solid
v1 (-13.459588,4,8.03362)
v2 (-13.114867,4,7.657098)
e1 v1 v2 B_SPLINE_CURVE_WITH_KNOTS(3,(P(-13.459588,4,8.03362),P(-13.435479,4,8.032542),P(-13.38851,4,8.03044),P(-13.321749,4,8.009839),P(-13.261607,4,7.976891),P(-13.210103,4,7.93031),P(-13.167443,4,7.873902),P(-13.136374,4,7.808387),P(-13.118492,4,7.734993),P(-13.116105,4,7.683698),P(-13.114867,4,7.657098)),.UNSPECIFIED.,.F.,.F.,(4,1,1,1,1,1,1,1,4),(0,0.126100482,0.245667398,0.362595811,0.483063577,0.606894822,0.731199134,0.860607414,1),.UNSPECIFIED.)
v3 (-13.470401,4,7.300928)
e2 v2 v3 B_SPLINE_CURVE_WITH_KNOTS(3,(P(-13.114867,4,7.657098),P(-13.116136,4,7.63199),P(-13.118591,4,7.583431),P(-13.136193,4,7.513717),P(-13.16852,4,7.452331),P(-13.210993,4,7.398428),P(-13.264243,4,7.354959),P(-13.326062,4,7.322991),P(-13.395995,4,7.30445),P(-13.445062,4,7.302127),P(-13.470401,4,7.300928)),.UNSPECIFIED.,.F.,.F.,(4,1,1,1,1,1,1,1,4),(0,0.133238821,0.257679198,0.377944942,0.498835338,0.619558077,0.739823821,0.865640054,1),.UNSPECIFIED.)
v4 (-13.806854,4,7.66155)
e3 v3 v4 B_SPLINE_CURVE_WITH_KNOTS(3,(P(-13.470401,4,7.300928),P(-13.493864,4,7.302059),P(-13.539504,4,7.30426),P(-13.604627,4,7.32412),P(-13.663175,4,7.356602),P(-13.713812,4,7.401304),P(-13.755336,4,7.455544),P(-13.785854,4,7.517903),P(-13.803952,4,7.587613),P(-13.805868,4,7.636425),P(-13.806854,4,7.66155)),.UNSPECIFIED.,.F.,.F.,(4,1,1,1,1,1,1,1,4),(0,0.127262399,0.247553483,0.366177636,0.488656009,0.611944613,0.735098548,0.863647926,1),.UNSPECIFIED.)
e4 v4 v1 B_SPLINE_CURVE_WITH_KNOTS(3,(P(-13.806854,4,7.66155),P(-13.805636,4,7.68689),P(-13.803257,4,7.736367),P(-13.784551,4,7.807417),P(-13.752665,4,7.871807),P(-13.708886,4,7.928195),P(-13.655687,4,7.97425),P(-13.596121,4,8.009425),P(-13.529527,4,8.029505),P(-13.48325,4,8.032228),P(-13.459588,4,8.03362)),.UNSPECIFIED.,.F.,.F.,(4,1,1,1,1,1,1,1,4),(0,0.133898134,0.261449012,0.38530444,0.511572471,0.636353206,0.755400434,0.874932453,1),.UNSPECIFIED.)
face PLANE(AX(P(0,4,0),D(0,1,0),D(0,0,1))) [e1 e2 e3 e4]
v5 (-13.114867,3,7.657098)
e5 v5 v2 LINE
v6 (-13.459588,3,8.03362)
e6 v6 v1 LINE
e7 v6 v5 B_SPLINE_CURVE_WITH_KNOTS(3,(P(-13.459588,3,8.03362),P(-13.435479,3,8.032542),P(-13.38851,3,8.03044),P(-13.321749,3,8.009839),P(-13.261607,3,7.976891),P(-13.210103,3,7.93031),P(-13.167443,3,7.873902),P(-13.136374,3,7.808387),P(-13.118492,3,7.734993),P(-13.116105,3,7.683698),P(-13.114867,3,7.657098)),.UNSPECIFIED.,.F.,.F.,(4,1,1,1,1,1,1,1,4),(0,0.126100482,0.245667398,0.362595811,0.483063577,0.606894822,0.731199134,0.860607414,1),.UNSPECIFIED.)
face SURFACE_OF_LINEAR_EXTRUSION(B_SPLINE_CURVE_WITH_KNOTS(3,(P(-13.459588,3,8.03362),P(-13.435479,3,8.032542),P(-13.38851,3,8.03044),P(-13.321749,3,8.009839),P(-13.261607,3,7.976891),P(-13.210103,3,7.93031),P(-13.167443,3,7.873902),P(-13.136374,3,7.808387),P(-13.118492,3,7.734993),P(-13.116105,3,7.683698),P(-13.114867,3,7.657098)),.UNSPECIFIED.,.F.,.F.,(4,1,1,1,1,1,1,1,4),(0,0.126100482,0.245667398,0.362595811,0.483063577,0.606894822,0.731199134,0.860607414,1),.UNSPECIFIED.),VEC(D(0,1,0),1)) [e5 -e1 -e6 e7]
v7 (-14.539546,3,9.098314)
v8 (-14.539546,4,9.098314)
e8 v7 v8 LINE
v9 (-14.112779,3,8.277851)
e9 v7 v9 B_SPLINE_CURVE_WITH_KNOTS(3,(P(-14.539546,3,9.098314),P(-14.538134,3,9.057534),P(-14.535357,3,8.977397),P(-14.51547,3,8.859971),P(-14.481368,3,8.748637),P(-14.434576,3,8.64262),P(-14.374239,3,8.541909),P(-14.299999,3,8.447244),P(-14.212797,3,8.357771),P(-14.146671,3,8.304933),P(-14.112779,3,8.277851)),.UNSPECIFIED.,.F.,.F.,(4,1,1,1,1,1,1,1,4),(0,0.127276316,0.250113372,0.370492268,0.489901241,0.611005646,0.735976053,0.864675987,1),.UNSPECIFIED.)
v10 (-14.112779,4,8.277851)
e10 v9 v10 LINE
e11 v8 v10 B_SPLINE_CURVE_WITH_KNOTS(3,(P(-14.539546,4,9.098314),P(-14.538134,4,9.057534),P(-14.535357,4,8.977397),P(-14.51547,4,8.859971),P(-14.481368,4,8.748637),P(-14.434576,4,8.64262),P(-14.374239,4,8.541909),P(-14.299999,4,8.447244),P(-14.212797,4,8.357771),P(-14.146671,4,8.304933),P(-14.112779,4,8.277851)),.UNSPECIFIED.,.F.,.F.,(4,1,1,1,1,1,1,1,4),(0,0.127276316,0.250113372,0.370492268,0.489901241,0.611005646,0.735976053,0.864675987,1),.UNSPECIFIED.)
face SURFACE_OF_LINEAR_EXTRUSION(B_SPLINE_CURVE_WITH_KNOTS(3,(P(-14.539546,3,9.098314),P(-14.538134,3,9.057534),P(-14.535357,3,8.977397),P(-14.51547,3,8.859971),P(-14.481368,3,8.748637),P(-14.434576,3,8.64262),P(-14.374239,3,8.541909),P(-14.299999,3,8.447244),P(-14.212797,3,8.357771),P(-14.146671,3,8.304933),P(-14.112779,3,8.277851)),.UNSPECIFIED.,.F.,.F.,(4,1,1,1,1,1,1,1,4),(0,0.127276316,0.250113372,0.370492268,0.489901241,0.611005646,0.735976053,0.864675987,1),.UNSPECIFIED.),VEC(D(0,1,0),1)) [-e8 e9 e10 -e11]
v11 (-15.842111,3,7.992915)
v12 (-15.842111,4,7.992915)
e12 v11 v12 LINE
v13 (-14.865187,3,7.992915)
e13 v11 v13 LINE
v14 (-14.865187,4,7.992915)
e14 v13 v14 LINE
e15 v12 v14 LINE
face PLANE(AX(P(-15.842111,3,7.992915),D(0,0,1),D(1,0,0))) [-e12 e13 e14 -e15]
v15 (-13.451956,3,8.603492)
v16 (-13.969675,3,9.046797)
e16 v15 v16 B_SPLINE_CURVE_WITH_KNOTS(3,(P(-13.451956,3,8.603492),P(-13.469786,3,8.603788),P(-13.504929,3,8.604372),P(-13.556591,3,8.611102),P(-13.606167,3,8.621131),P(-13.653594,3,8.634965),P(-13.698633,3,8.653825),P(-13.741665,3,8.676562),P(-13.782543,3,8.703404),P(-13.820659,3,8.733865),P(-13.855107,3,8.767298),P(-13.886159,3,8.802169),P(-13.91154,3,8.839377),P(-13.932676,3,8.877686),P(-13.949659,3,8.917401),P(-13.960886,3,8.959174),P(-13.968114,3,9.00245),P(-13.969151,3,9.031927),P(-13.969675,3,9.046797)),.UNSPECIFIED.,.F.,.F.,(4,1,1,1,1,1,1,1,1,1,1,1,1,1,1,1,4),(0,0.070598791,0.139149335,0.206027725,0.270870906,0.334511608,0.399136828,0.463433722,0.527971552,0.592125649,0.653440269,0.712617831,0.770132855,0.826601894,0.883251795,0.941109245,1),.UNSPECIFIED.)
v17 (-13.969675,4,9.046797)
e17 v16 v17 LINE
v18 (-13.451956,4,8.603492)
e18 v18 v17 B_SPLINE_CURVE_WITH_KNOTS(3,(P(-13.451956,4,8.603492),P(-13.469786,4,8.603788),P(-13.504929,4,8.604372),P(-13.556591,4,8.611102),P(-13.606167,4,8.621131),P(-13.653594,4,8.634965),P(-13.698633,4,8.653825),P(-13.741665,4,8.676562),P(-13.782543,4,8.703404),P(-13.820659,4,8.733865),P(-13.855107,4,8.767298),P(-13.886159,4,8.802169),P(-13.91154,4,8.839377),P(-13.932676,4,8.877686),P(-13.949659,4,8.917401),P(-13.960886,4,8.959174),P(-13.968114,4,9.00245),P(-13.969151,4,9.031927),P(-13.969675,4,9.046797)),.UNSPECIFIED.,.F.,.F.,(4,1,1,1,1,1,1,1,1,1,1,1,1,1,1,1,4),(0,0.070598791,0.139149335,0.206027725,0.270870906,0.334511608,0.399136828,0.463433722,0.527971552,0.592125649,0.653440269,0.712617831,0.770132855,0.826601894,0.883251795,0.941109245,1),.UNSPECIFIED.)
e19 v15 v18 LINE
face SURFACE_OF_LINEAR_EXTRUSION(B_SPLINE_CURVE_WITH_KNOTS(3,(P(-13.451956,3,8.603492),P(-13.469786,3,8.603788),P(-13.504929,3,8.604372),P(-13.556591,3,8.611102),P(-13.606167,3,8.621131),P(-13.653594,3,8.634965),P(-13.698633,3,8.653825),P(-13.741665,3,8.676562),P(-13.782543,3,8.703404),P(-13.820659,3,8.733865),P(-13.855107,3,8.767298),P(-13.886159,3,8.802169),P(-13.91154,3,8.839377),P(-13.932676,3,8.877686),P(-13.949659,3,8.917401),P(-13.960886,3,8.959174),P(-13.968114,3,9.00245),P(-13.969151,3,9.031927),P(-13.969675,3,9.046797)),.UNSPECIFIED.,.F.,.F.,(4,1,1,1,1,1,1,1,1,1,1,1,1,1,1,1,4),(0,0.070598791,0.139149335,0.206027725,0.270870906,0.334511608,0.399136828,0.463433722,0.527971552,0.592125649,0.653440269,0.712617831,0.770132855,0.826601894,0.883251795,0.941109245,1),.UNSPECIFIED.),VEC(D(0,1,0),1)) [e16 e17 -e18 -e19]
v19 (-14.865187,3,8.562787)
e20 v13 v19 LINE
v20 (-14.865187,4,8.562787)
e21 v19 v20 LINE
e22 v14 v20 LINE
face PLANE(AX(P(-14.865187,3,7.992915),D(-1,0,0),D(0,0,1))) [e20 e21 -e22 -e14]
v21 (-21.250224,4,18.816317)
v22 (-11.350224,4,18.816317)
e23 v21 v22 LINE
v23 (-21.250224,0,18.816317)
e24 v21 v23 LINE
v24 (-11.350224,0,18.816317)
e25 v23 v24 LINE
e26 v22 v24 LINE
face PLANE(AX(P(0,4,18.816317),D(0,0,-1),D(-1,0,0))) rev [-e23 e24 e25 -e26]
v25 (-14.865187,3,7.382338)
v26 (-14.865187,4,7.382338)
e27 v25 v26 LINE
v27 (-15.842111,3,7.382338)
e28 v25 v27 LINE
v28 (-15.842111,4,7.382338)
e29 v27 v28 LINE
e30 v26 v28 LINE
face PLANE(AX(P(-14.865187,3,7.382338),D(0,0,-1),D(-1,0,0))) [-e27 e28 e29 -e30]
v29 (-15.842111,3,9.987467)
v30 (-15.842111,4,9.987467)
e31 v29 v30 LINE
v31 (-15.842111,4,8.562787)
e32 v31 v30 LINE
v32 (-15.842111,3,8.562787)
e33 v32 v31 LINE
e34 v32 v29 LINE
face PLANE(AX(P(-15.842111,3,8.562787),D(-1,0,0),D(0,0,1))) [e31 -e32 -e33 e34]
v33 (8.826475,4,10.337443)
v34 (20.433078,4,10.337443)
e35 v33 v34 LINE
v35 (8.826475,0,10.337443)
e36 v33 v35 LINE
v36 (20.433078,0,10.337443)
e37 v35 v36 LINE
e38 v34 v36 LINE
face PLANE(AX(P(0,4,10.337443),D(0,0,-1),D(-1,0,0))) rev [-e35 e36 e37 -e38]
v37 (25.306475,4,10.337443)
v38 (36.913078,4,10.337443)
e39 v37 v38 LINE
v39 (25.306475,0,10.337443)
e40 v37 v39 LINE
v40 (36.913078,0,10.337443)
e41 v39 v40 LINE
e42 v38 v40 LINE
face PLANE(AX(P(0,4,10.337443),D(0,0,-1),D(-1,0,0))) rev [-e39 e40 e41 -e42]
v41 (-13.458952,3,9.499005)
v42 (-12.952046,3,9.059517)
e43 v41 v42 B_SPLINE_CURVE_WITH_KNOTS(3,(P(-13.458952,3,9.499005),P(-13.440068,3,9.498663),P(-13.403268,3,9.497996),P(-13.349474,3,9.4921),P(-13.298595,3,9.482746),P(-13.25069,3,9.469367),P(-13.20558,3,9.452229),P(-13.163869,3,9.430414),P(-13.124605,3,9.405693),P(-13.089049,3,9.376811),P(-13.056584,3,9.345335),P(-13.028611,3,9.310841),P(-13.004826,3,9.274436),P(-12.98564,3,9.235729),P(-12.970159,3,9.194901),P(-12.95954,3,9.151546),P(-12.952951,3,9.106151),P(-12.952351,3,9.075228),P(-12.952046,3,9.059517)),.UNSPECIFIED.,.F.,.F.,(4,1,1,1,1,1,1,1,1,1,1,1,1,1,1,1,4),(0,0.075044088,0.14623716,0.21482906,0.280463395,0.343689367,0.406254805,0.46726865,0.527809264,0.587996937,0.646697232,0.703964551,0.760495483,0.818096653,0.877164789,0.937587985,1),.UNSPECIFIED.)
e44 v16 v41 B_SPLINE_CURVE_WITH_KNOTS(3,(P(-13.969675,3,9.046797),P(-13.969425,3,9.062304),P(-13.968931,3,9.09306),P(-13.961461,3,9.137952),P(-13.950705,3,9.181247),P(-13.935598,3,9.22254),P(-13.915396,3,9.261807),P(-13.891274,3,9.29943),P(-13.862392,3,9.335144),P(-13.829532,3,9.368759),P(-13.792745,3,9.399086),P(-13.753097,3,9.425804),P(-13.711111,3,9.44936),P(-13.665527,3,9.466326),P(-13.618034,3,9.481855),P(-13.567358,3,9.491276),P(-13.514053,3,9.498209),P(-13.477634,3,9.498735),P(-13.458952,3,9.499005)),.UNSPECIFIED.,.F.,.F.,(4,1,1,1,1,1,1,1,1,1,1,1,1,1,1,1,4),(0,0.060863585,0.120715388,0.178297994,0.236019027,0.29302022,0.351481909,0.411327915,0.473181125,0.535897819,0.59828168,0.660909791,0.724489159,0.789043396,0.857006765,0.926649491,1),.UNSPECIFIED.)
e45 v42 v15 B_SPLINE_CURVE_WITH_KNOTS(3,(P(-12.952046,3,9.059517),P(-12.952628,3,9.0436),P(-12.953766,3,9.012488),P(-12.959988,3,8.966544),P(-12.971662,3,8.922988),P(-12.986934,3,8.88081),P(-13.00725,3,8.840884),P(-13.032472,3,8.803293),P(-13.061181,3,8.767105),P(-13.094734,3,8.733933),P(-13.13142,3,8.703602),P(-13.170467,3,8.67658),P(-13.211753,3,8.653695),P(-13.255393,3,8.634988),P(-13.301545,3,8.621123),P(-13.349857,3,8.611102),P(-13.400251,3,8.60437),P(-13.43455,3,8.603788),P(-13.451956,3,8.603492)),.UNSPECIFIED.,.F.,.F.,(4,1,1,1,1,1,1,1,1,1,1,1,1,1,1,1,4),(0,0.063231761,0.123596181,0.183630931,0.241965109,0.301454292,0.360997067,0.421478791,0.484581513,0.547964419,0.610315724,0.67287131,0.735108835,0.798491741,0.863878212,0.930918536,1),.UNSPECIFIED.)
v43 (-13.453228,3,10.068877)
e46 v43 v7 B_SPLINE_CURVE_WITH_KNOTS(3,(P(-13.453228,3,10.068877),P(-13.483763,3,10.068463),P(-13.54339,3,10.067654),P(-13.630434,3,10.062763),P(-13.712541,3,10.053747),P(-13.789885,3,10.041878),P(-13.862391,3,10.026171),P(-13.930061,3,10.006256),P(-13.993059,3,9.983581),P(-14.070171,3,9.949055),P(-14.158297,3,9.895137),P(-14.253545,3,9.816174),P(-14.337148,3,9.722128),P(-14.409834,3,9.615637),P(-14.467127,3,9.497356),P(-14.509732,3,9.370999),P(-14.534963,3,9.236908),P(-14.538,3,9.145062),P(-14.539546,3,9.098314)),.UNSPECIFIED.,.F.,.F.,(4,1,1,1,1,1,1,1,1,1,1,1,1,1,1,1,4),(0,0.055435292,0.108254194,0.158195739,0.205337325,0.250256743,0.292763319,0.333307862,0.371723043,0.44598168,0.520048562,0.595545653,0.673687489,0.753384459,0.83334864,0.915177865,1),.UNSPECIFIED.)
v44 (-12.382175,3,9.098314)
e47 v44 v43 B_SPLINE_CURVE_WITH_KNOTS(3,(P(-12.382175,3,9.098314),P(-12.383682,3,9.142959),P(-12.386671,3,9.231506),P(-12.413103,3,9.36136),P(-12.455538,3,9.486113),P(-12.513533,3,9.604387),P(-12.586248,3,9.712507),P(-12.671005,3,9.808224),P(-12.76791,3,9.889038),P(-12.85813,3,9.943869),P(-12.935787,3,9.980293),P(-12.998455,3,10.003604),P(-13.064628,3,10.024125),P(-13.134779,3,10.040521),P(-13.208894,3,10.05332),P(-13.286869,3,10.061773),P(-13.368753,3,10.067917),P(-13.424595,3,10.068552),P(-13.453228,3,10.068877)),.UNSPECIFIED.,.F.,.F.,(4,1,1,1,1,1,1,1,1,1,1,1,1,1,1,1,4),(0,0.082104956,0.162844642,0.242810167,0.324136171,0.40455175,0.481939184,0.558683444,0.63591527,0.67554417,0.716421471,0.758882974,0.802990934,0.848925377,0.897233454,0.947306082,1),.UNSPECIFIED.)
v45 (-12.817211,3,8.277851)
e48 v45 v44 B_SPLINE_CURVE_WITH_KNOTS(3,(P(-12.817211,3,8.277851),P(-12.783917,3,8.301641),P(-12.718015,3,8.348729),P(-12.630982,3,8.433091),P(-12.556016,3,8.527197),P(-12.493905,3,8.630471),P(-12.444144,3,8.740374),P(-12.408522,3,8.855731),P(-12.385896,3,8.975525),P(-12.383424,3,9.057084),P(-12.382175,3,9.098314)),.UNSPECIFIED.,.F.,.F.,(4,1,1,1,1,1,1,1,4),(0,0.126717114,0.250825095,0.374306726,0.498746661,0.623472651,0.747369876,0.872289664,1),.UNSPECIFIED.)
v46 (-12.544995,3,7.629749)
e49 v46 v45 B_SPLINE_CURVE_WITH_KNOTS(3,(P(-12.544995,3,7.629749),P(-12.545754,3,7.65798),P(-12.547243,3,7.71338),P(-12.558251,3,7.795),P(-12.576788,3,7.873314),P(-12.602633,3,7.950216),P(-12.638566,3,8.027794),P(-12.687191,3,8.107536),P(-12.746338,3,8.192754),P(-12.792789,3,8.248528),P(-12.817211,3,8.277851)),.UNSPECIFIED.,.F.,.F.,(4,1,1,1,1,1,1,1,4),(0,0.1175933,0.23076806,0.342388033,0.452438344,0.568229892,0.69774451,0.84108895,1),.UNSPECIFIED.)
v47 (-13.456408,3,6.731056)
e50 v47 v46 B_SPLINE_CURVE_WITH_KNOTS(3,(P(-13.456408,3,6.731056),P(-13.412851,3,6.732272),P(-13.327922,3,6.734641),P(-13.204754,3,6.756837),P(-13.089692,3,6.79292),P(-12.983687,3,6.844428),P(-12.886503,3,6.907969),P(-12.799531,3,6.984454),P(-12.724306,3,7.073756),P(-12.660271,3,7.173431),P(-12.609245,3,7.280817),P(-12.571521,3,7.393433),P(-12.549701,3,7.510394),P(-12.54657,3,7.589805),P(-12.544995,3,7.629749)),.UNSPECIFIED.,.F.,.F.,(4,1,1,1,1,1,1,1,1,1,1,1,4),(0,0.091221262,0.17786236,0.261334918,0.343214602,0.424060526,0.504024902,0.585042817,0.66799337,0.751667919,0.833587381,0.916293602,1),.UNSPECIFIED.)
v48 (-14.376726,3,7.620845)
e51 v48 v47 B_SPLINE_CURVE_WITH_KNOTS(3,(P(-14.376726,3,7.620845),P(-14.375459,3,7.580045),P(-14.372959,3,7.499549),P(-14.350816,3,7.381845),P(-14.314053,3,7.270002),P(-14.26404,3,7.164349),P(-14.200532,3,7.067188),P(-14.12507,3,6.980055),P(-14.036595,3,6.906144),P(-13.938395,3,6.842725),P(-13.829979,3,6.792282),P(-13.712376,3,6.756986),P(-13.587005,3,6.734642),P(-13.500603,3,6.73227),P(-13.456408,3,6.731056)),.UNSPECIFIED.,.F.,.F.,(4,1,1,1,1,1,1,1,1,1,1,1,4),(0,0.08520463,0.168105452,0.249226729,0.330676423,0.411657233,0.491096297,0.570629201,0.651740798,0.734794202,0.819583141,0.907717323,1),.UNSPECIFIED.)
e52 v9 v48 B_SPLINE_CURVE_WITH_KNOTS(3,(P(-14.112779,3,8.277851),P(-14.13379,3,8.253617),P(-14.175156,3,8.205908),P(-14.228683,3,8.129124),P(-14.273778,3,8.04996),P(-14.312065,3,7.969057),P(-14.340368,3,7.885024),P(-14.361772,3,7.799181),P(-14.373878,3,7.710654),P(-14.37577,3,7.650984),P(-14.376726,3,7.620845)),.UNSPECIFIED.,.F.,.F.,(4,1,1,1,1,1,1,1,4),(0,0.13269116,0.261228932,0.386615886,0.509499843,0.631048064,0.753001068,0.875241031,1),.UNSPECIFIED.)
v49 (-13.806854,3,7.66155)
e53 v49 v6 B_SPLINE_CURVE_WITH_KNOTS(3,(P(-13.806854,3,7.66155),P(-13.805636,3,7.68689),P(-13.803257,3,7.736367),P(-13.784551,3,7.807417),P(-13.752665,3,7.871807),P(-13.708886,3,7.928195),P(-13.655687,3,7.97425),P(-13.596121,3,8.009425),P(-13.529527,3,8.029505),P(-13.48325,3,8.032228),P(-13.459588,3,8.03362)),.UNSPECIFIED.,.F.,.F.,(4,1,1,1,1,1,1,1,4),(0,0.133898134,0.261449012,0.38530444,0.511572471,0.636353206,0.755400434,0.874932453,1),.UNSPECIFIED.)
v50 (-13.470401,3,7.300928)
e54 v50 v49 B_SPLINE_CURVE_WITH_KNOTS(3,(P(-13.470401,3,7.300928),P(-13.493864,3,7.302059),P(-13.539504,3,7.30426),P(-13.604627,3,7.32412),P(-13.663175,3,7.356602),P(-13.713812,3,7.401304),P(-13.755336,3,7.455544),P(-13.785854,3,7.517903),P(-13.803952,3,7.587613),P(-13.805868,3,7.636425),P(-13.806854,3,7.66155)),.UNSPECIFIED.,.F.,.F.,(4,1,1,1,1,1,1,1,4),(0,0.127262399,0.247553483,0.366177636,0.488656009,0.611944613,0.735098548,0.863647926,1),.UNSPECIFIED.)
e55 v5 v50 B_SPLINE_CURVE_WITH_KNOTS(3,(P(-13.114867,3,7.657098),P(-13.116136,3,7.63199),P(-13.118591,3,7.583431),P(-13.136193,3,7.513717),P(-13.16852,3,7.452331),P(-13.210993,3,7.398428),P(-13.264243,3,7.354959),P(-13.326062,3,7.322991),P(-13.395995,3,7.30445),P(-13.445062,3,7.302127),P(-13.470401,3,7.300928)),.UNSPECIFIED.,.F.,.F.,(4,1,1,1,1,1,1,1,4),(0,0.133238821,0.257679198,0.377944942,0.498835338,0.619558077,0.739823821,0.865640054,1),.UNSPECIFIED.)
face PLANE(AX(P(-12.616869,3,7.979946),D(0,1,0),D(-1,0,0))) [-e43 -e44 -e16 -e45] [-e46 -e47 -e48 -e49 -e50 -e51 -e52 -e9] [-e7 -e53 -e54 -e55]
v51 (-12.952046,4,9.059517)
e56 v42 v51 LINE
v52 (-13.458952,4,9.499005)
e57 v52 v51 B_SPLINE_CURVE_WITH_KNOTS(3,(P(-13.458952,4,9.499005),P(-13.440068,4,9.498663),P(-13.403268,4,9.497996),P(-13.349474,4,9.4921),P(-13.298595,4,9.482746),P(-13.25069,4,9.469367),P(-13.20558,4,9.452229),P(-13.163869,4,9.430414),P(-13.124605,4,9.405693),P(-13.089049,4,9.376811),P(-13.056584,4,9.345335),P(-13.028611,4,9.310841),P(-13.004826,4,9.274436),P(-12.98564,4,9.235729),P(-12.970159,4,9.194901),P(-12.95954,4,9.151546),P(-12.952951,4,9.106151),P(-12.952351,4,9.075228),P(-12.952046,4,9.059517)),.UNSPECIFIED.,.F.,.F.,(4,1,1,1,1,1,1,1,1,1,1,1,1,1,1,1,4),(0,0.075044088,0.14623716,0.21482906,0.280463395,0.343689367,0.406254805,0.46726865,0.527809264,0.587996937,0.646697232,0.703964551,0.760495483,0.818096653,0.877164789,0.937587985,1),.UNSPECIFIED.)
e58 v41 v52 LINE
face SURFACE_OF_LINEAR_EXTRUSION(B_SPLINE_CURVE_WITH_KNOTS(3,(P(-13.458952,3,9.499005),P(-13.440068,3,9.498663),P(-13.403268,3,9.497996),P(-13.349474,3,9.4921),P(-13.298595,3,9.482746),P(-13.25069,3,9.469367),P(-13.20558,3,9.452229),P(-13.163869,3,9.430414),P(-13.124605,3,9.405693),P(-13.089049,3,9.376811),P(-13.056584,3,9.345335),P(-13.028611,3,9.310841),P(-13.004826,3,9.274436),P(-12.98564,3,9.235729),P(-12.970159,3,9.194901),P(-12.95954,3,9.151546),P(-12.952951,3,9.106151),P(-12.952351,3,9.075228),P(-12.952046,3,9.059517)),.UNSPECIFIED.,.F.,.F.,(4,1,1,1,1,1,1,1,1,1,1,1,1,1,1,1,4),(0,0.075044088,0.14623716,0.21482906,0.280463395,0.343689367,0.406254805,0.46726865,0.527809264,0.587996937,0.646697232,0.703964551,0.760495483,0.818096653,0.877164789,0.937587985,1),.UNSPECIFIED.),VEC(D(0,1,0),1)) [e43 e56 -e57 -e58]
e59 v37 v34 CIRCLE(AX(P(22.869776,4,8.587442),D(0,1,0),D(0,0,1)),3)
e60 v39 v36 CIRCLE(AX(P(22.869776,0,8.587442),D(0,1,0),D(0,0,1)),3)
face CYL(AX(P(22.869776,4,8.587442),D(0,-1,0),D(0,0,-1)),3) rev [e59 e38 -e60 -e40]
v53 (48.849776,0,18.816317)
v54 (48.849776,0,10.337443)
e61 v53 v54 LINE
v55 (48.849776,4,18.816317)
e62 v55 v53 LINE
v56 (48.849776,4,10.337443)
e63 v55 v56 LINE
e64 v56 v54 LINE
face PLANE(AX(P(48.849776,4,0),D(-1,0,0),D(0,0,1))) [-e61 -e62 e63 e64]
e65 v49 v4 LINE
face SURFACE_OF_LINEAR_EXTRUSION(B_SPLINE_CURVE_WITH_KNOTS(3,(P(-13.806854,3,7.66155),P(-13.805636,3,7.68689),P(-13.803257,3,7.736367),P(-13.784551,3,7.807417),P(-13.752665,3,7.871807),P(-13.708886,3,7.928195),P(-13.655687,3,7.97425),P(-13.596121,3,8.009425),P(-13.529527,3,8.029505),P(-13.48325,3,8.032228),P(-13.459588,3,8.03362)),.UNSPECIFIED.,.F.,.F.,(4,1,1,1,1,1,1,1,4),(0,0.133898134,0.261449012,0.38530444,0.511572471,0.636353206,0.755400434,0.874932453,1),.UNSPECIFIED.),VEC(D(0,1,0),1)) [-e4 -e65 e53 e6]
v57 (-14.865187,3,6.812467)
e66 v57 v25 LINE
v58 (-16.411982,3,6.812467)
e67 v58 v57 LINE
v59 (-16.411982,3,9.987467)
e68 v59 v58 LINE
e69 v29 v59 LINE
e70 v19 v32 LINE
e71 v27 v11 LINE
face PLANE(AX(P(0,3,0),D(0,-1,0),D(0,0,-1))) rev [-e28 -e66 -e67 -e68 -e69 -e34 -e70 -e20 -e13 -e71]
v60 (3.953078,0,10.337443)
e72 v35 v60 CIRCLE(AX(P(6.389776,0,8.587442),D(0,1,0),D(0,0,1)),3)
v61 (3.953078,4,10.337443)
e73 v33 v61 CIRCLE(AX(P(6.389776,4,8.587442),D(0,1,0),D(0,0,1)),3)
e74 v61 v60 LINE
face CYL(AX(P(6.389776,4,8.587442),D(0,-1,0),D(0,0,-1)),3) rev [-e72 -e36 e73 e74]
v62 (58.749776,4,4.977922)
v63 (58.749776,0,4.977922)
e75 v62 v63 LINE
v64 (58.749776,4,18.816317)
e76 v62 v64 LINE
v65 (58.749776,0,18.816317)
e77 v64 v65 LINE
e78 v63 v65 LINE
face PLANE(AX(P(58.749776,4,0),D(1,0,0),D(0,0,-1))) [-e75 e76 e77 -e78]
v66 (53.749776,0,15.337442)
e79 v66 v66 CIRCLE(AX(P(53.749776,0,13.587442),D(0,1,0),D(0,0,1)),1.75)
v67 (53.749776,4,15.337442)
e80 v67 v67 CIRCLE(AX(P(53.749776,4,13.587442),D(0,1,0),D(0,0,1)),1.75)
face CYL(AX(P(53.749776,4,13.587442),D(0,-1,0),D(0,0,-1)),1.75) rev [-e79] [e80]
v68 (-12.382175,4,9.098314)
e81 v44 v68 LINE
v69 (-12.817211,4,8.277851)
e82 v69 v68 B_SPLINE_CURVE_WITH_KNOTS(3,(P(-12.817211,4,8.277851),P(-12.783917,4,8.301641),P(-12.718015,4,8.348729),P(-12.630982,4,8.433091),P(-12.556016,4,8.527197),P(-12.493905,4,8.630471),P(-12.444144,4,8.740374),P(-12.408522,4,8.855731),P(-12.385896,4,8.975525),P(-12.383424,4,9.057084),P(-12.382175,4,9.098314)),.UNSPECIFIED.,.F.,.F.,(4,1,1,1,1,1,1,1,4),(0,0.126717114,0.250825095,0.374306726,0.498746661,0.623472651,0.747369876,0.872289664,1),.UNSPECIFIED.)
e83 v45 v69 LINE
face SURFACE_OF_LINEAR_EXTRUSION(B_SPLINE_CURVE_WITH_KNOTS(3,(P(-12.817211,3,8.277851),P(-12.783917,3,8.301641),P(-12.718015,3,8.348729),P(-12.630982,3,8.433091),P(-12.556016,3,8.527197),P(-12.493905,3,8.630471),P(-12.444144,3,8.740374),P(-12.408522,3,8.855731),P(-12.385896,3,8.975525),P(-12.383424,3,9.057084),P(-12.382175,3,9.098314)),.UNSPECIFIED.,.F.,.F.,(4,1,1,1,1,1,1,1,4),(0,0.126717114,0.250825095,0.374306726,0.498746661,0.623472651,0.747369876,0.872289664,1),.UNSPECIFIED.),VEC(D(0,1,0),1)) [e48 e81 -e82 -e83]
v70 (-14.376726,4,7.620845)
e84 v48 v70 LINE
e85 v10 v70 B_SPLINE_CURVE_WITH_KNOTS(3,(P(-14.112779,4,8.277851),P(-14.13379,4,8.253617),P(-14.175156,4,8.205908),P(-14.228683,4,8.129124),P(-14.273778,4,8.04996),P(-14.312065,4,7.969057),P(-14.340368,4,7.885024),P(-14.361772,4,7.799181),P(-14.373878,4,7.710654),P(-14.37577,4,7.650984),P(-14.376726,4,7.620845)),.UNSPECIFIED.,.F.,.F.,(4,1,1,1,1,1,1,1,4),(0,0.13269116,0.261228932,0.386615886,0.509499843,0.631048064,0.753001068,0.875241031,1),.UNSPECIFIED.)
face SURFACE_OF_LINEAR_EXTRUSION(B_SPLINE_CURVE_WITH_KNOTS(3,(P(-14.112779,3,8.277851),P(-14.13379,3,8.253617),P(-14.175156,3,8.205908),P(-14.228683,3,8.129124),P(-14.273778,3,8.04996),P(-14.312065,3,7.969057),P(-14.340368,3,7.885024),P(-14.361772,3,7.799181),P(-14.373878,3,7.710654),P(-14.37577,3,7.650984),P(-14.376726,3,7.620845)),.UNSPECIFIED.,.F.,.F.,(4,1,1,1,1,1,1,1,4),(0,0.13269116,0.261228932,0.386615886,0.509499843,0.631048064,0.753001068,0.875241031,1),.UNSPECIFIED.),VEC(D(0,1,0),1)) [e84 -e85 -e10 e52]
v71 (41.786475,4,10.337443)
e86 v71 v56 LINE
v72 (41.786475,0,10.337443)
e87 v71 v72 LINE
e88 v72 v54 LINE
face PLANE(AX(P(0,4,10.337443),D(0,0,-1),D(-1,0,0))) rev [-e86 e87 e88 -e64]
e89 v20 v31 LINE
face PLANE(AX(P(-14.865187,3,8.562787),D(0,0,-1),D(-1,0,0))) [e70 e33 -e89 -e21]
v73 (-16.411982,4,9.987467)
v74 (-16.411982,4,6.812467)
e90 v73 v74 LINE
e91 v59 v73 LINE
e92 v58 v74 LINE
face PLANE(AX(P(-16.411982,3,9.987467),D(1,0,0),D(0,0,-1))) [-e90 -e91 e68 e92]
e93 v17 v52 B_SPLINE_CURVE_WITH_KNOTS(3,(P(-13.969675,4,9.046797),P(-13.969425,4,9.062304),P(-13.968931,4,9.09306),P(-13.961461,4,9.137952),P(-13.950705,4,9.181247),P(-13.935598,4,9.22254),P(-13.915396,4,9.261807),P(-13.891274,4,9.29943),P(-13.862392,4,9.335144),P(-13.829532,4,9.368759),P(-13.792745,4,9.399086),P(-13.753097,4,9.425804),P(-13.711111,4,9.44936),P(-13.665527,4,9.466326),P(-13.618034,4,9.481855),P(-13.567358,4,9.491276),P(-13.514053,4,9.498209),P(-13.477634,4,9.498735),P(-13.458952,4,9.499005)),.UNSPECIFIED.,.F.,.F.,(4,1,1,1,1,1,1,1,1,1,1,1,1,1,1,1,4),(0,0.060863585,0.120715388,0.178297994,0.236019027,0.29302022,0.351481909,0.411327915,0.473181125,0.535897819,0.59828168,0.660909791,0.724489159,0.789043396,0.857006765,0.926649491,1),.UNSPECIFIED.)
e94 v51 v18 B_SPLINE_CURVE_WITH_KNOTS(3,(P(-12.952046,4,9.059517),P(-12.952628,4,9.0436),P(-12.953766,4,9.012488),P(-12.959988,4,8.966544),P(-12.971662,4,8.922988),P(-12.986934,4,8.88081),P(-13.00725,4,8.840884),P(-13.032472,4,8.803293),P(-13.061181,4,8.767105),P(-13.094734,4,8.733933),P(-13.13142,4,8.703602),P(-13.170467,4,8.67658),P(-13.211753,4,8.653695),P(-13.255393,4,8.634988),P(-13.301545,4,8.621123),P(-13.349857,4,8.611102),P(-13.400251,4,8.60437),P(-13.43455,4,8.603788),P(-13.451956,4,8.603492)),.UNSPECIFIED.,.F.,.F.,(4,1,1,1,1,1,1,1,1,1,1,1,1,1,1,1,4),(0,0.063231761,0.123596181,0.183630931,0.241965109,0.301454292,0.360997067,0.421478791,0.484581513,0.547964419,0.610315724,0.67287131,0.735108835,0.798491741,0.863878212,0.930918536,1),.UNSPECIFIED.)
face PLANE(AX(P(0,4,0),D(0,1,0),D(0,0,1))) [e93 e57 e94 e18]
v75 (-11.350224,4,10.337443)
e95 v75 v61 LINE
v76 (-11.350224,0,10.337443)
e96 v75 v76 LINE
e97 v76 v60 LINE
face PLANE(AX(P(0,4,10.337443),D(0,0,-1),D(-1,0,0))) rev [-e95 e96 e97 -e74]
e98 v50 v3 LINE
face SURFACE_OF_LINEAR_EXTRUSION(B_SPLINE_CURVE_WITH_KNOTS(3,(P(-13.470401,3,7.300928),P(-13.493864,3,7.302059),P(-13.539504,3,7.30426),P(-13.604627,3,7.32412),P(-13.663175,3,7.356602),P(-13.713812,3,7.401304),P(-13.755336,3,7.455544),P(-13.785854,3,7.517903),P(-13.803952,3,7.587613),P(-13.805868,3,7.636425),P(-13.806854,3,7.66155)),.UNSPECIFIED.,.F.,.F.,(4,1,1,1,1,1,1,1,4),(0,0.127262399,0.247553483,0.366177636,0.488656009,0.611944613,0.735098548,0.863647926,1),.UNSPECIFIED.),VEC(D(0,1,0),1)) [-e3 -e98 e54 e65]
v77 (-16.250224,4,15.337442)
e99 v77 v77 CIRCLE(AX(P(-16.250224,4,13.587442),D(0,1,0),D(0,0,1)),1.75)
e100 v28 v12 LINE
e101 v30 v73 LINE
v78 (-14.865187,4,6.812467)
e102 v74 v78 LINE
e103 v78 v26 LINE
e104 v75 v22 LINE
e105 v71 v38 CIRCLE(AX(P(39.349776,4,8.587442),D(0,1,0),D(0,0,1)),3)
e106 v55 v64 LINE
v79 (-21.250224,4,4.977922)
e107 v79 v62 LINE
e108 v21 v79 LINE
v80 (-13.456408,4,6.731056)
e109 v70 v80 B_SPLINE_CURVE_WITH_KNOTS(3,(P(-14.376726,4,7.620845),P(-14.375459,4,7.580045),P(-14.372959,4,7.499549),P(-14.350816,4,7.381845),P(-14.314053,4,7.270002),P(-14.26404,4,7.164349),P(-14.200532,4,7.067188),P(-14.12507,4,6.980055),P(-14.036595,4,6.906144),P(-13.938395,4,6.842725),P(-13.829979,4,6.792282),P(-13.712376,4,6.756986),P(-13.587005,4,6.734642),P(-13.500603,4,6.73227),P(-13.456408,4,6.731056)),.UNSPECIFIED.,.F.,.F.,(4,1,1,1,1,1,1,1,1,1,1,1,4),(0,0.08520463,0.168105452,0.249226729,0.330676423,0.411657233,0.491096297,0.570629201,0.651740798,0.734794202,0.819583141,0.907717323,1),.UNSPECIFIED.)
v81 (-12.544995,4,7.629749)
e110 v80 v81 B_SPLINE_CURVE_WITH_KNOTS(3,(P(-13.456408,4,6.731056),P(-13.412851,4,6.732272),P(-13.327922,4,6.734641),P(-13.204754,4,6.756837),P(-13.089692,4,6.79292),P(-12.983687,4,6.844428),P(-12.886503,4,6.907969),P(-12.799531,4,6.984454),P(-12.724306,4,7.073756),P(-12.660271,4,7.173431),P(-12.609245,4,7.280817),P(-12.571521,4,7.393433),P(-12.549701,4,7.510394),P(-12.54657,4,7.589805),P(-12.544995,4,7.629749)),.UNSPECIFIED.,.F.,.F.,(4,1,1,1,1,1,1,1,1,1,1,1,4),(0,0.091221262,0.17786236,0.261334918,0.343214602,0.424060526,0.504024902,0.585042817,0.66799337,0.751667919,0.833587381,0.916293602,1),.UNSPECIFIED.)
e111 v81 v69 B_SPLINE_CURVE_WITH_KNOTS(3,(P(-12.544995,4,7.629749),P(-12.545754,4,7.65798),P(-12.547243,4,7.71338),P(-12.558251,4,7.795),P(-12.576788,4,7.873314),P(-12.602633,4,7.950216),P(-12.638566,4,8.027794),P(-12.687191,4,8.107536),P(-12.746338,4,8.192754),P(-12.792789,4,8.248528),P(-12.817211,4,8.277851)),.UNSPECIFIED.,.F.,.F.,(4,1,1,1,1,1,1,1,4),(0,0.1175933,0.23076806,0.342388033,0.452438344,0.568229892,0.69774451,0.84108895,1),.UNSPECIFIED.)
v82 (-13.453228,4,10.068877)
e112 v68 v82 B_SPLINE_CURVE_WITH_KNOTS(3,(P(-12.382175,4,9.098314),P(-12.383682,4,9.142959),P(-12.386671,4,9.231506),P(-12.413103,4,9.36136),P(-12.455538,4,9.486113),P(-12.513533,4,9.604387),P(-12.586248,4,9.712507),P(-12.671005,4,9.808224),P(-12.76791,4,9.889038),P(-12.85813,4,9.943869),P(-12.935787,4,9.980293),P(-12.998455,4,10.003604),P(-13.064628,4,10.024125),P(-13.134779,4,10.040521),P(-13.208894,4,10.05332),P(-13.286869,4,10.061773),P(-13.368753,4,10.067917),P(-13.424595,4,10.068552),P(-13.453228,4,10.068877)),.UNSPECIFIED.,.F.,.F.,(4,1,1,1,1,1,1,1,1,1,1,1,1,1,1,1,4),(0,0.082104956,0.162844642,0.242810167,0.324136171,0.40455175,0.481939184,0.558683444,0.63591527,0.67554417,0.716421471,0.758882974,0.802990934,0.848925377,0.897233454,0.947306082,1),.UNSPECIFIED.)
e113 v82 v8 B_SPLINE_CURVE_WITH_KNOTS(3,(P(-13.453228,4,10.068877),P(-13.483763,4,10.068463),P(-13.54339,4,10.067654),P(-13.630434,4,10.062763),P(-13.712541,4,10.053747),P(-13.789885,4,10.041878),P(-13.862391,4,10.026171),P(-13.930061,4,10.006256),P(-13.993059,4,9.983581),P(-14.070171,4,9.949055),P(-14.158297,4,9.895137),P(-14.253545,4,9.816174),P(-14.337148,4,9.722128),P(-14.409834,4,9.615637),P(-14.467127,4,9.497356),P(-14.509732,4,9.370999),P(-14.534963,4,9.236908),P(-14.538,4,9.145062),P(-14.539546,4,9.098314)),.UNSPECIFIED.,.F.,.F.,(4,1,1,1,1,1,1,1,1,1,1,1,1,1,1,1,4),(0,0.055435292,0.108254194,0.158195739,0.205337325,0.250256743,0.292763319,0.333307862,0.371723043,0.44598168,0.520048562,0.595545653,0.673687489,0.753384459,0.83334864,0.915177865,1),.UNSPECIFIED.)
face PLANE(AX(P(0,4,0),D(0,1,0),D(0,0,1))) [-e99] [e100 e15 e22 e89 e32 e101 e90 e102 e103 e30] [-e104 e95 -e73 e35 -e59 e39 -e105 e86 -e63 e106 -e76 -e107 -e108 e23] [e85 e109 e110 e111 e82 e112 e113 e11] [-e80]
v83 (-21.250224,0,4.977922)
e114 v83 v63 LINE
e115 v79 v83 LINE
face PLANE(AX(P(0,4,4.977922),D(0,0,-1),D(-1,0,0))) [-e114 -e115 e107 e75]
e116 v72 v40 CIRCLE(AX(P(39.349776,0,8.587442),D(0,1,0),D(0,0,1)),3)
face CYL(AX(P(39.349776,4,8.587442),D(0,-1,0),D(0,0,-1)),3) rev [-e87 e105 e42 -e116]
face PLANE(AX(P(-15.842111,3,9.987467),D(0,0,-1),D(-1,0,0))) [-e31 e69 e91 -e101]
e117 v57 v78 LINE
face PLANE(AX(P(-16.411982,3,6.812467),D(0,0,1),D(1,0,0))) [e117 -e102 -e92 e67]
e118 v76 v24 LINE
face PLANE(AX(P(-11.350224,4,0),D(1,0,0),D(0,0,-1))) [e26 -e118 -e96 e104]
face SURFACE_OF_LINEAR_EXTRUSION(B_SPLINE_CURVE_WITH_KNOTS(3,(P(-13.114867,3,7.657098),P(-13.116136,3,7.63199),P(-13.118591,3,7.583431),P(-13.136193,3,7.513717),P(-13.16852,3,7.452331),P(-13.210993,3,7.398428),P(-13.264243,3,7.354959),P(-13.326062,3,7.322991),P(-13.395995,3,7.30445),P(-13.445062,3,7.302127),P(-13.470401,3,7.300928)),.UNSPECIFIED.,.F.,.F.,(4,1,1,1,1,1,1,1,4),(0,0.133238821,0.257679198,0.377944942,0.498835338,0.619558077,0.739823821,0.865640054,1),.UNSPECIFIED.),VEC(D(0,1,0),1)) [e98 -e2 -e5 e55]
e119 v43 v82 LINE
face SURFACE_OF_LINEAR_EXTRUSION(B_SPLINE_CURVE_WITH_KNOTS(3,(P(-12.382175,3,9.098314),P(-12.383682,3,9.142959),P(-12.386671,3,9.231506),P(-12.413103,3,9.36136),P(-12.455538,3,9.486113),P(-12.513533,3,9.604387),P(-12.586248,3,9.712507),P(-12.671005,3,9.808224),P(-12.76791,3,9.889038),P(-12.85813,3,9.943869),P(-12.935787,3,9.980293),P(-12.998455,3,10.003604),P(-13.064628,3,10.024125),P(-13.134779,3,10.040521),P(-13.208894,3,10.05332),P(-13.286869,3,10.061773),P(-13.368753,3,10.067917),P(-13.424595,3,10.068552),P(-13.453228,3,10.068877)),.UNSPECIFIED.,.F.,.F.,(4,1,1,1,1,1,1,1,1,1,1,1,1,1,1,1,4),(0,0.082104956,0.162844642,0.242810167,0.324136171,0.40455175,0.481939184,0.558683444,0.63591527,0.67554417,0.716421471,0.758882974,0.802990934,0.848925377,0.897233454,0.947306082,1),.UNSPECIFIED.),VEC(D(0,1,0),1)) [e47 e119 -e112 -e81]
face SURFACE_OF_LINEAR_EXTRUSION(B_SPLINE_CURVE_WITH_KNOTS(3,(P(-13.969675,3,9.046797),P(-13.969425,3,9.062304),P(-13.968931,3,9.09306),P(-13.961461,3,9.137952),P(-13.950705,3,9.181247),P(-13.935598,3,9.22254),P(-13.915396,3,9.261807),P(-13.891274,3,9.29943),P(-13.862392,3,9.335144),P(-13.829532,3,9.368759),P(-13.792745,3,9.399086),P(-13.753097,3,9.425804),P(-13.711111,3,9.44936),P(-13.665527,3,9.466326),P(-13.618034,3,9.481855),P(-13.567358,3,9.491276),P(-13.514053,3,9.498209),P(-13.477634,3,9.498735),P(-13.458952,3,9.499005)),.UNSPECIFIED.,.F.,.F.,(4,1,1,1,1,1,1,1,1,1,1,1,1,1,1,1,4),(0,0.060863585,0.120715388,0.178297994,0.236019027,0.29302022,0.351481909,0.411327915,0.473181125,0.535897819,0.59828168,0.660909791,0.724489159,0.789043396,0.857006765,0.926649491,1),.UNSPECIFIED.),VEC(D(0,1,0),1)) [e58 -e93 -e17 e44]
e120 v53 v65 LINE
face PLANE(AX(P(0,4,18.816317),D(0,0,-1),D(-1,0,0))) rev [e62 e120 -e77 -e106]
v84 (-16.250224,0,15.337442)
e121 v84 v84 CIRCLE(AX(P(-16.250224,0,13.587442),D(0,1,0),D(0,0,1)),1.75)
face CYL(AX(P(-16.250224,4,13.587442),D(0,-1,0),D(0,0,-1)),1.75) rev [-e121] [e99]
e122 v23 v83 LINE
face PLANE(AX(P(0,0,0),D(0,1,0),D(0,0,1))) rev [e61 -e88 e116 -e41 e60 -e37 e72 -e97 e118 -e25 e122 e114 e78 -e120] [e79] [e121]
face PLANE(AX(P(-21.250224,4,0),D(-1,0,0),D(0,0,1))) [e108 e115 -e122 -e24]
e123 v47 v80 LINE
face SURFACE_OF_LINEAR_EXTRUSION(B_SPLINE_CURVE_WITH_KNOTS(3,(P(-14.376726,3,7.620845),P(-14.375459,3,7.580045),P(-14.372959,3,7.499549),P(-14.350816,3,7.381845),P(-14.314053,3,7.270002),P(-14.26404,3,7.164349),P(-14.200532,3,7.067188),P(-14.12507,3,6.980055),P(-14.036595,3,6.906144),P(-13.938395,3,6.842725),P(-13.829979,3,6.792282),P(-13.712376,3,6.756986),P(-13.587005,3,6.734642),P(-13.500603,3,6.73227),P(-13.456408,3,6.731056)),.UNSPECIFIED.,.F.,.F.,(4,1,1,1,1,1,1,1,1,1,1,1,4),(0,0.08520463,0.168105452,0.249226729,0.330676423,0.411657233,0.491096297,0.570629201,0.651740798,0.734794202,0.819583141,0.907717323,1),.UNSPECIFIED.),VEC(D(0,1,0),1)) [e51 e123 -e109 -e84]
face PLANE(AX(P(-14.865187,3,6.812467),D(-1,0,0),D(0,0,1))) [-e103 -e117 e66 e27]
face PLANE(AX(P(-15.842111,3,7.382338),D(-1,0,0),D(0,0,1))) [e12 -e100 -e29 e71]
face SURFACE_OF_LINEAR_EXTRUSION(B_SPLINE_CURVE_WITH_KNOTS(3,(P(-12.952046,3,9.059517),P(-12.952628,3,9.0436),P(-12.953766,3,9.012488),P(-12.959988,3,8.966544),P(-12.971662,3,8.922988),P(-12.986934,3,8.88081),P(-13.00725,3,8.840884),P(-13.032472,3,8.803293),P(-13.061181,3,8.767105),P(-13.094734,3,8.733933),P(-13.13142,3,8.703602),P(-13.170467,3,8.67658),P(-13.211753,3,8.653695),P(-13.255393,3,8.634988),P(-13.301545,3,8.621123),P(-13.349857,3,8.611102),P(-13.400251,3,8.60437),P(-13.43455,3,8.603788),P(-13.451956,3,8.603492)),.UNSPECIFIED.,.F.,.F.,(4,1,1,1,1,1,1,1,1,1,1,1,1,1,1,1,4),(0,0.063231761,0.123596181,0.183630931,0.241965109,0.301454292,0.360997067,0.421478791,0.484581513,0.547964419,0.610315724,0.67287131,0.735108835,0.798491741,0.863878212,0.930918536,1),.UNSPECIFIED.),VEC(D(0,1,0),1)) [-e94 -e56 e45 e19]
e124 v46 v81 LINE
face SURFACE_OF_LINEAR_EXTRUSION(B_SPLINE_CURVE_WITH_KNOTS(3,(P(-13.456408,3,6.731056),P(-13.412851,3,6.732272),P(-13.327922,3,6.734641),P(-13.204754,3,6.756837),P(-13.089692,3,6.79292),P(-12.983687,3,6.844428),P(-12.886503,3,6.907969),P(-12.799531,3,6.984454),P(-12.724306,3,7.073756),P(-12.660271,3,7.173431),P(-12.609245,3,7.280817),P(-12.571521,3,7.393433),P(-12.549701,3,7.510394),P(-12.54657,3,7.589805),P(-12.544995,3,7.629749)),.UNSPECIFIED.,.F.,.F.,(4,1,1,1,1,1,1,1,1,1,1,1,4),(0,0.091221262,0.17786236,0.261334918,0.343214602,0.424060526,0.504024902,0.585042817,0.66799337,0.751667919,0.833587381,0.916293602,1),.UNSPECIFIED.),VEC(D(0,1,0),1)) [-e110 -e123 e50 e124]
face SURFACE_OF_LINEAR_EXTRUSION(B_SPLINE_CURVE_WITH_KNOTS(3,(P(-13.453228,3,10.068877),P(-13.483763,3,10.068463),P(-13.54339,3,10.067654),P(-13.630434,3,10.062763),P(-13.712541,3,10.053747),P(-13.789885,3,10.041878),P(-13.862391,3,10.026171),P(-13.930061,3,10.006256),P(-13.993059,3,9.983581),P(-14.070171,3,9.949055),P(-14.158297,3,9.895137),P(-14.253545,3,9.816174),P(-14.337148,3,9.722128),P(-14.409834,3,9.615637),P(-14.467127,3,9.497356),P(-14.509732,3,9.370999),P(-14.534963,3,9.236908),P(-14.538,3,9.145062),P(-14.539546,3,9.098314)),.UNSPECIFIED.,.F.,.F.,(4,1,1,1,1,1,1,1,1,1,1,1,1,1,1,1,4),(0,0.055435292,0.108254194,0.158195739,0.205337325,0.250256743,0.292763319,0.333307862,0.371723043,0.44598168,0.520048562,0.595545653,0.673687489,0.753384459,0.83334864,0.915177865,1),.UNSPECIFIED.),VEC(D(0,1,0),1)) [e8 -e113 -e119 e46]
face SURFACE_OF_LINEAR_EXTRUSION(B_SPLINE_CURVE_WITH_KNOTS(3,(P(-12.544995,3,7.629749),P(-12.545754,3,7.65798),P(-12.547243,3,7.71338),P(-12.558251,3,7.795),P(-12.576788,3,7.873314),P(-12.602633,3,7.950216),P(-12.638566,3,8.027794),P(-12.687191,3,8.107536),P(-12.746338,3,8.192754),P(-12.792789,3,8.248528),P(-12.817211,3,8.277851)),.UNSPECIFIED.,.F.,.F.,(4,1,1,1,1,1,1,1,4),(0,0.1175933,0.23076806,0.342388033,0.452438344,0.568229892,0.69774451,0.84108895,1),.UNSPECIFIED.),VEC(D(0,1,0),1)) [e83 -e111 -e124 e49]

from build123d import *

# Parameters (mm, degrees)
BOSS_EXTRUDE1_OUTLINE_R = 1.75
BOSS_EXTRUDE1_DEPTH     = 4
CUT_EXTRUDE1_DEPTH      = 1


# Read off the part's stored shape, not the designer's step: Boss-Extrude1
with BuildPart() as part:
    # Boss-Extrude1 outline → Boss-Extrude1 (new body)
    with BuildSketch(Plane(origin=(0, 0, 0), x_dir=(1, 0, 0), z_dir=(0, 1, 0))):
        with BuildLine():
            Line((25.306474615, -10.33744254), (36.91307775, -10.33744254))
            ThreePointArc((36.91307775, -10.33744254), (39.349776183, -5.587442326), (41.786474615, -10.33744254))
            Line((41.786474615, -10.33744254), (48.849776182, -10.33744254))
            Line((48.849776182, -10.33744254), (48.849776182, -18.81631662))
            Line((48.849776182, -18.81631662), (58.749776182, -18.81631662))
            Line((58.749776182, -18.81631662), (58.749776182, -4.977921711))
            Line((58.749776182, -4.977921711), (-21.250223818, -4.977921711))
            Line((-21.250223818, -4.977921711), (-21.250223818, -18.81631662))
            Line((-21.250223818, -18.81631662), (-11.350223818, -18.81631662))
            Line((-11.350223818, -18.81631662), (-11.350223818, -10.33744254))
            Line((-11.350223818, -10.33744254), (3.95307775, -10.33744254))
            ThreePointArc((3.95307775, -10.33744254), (6.389776182, -5.587442326), (8.826474615, -10.33744254))
            Line((8.826474615, -10.33744254), (20.43307775, -10.33744254))
            ThreePointArc((20.43307775, -10.33744254), (22.869776182, -5.587442326), (25.306474615, -10.33744254))
        make_face()
        with Locations((-16.250223818, -13.587442433)):
            Circle(BOSS_EXTRUDE1_OUTLINE_R, mode=Mode.SUBTRACT)
        with Locations((53.749776182, -13.587442433)):
            Circle(BOSS_EXTRUDE1_OUTLINE_R, mode=Mode.SUBTRACT)
    extrude(amount=BOSS_EXTRUDE1_DEPTH)

    # Sketch2 → Cut-Extrude1 (cut)
    # profile 1 of 2: a face of its own
    with BuildSketch(Plane(origin=(0, 4, 0), x_dir=(1, 0, 0), z_dir=(0, 1, 0))):
        Polygon((-16.41198232, -6.812466594), (-14.865187448, -6.812466594), (-14.865187448, -7.382338389), (-15.842110525, -7.382338389), (-15.842110525, -7.992915312), (-14.865187448, -7.992915312), (-14.865187448, -8.562787107), (-15.842110525, -8.562787107), (-15.842110525, -9.987466594), (-16.41198232, -9.987466594), align=None)
    # profile 2 of 2: a face of its own
    with BuildSketch(Plane(origin=(0, 4, 0), x_dir=(1, 0, 0), z_dir=(0, 1, 0))):
        with BuildLine():
            add(Edge.make_bspline(
                [(-12.817210686, -8.277851209), (-12.783916812, -8.301640582), (-12.718014592, -8.348729498), (-12.630981866, -8.433091053), (-12.556016347, -8.527197346), (-12.493905254, -8.630471147), (-12.44414372, -8.740373961), (-12.408522012, -8.855731057), (-12.385895512, -8.975524957), (-12.383424023, -9.057083985), (-12.382174628, -9.09831395)],
                knots=[0, 0, 0, 0, 1.013736912, 2.006600758, 2.994453809, 3.989973287, 4.987781207, 5.978959008, 6.978317308, 8, 8, 8, 8], degree=3))
            add(Edge.make_bspline(
                [(-12.382174628, -9.09831395), (-12.383681928, -9.142958744), (-12.386671463, -9.231505963), (-12.413102949, -9.361360446), (-12.455537639, -9.486113154), (-12.513532925, -9.604387133), (-12.586248347, -9.71250688), (-12.671004934, -9.808223668), (-12.767909528, -9.889037688), (-12.858130451, -9.94386948), (-12.93578675, -9.980293202), (-12.998454703, -10.003603653), (-13.064627941, -10.024125244), (-13.134778669, -10.040520633), (-13.208894129, -10.053319925), (-13.28686855, -10.061772553), (-13.368753261, -10.067917099), (-13.424595172, -10.068551539), (-13.453228314, -10.06887685)],
                knots=[0, 0, 0, 0, 1.313679292, 2.605514271, 3.884962679, 5.186178731, 6.472827995, 7.711026938, 8.938935107, 10.174644318, 10.808706728, 11.462743532, 12.142127587, 12.847854939, 13.582806024, 14.355735269, 15.156897313, 16, 16, 16, 16], degree=3))
            add(Edge.make_bspline(
                [(-13.453228314, -10.06887685), (-13.483762719, -10.068462664), (-13.543390392, -10.067653841), (-13.630433512, -10.062763265), (-13.712540889, -10.05374694), (-13.789884756, -10.041877645), (-13.862390702, -10.026171129), (-13.930060872, -10.006256127), (-13.993058665, -9.983580681), (-14.070171273, -9.949055369), (-14.158297, -9.895136701), (-14.253544974, -9.816174366), (-14.337148326, -9.722127758), (-14.409833523, -9.615636751), (-14.467126735, -9.497356478), (-14.509731675, -9.370999371), (-14.534962825, -9.236907843), (-14.538000373, -9.145061739), (-14.539546423, -9.09831395)],
                knots=[0, 0, 0, 0, 0.886964665, 1.7320671, 2.531131818, 3.285397207, 4.004107883, 4.684213108, 5.332925796, 5.947568694, 7.135706876, 8.320776993, 9.52873045, 10.778999824, 12.05415135, 13.333578234, 14.642845846, 16, 16, 16, 16], degree=3))
            add(Edge.make_bspline(
                [(-14.539546423, -9.09831395), (-14.538133592, -9.057534194), (-14.535357209, -8.977397037), (-14.515469601, -8.859970757), (-14.481368397, -8.74863675), (-14.434576238, -8.642619953), (-14.374238543, -8.54190857), (-14.29999851, -8.447243639), (-14.212797428, -8.357771149), (-14.146671217, -8.304933073), (-14.112778594, -8.277851209)],
                knots=[0, 0, 0, 0, 1.01821053, 2.000906977, 2.963938143, 3.919209931, 4.888045165, 5.887808425, 6.917407893, 8, 8, 8, 8], degree=3))
            add(Edge.make_bspline(
                [(-14.112778594, -8.277851209), (-14.133790223, -8.25361737), (-14.175155792, -8.205908238), (-14.228683245, -8.129124193), (-14.27377787, -8.049959762), (-14.312065354, -7.969057406), (-14.340368438, -7.885024188), (-14.361772094, -7.799181284), (-14.373877981, -7.710654149), (-14.375770168, -7.650984229), (-14.37672591, -7.620844999)],
                knots=[0, 0, 0, 0, 1.061529281, 2.089831458, 3.092927091, 4.075998741, 5.048384512, 6.024008542, 7.00192825, 8, 8, 8, 8], degree=3))
            add(Edge.make_bspline(
                [(-14.37672591, -7.620844999), (-14.375458741, -7.580045367), (-14.372958667, -7.499549264), (-14.35081565, -7.381844957), (-14.314052865, -7.270002405), (-14.264040225, -7.164349068), (-14.200531945, -7.067187545), (-14.125070359, -6.98005538), (-14.036594626, -6.906144188), (-13.93839492, -6.842725124), (-13.829979018, -6.792282188), (-13.71237556, -6.756985999), (-13.587004623, -6.734641651), (-13.500602716, -6.732269623), (-13.456408402, -6.731056337)],
                knots=[0, 0, 0, 0, 1.022455555, 2.017265428, 2.990720743, 3.968117071, 4.939886797, 5.893155559, 6.847550415, 7.820889576, 8.817530429, 9.83499769, 10.892607882, 12, 12, 12, 12], degree=3))
            add(Edge.make_bspline(
                [(-13.456408402, -6.731056337), (-13.412850602, -6.732271608), (-13.327922012, -6.734641132), (-13.204754302, -6.756837427), (-13.089692277, -6.792919844), (-12.983687415, -6.844427856), (-12.886503285, -6.907969153), (-12.799531264, -6.984453863), (-12.724306479, -7.073756197), (-12.66027104, -7.173431259), (-12.609244635, -7.280816697), (-12.571520994, -7.393432622), (-12.549701195, -7.510393862), (-12.546570098, -7.589805025), (-12.544995141, -7.629749246)],
                knots=[0, 0, 0, 0, 1.094655142, 2.134348324, 3.136019022, 4.118575226, 5.088726318, 6.048298823, 7.020513804, 8.015920439, 9.020015034, 10.003048569, 10.995523219, 12, 12, 12, 12], degree=3))
            add(Edge.make_bspline(
                [(-12.544995141, -7.629749246), (-12.545753836, -7.657979661), (-12.547242718, -7.713379741), (-12.558251211, -7.794999693), (-12.576788162, -7.873314147), (-12.60263287, -7.950215641), (-12.638565836, -8.027794016), (-12.687191493, -8.107535817), (-12.746338221, -8.19275433), (-12.792789101, -8.248528105), (-12.817210686, -8.277851209)],
                knots=[0, 0, 0, 0, 0.940746401, 1.846144481, 2.739104268, 3.619506754, 4.545839139, 5.581956076, 6.728711598, 8, 8, 8, 8], degree=3))
        make_face()
        with BuildLine():
            add(Edge.make_bspline(
                [(-13.47040079, -7.300928132), (-13.493863602, -7.302059257), (-13.539503955, -7.304259544), (-13.604627394, -7.324119575), (-13.66317549, -7.356602067), (-13.713811769, -7.401304369), (-13.755336157, -7.455543915), (-13.7858543, -7.517903357), (-13.80395192, -7.58761311), (-13.805867905, -7.6364252), (-13.806854115, -7.661550128)],
                knots=[0, 0, 0, 0, 1.018099191, 1.980427864, 2.929421084, 3.909248076, 4.895556904, 5.880788387, 6.909183412, 8, 8, 8, 8], degree=3))
            add(Edge.make_bspline(
                [(-13.806854115, -7.661550128), (-13.805635844, -7.686889627), (-13.803257052, -7.736367441), (-13.784550526, -7.807416545), (-13.752664735, -7.871807238), (-13.70888576, -7.92819461), (-13.655687215, -7.974250185), (-13.596121153, -8.00942487), (-13.529526976, -8.029505185), (-13.483250413, -8.032228147), (-13.45958849, -8.03362044)],
                knots=[0, 0, 0, 0, 1.07118507, 2.091592095, 3.082435519, 4.092579768, 5.090825648, 6.043203473, 6.999459622, 8, 8, 8, 8], degree=3))
            add(Edge.make_bspline(
                [(-13.45958849, -8.03362044), (-13.435479226, -8.032541652), (-13.388509856, -8.03043997), (-13.321749401, -8.009838627), (-13.261606764, -7.976890976), (-13.21010348, -7.930310288), (-13.16744294, -7.873902495), (-13.136374254, -7.808386518), (-13.118492241, -7.734993318), (-13.116104929, -7.683698208), (-13.114866936, -7.657098004)],
                knots=[0, 0, 0, 0, 1.008803858, 1.965339183, 2.900766489, 3.864508618, 4.855158575, 5.849593072, 6.884859315, 8, 8, 8, 8], degree=3))
            add(Edge.make_bspline(
                [(-13.114866936, -7.657098004), (-13.116136245, -7.631989686), (-13.118591044, -7.583431082), (-13.136192895, -7.513716807), (-13.168519575, -7.452330647), (-13.210992661, -7.398427917), (-13.264242529, -7.354958718), (-13.326061725, -7.322991206), (-13.395995039, -7.304449741), (-13.445061785, -7.302127422), (-13.47040079, -7.300928132)],
                knots=[0, 0, 0, 0, 1.065910571, 2.061433587, 3.023559535, 3.990682701, 4.956464619, 5.918590567, 6.925120432, 8, 8, 8, 8], degree=3))
        make_face(mode=Mode.SUBTRACT)
        with BuildLine():
            add(Edge.make_bspline(
                [(-13.451956279, -8.603492235), (-13.46978624, -8.603788328), (-13.50492887, -8.604371924), (-13.556591424, -8.611101658), (-13.606166954, -8.621130626), (-13.653593954, -8.634965304), (-13.698632825, -8.653825453), (-13.741665347, -8.67656171), (-13.782542906, -8.703403911), (-13.820659173, -8.733864736), (-13.855107371, -8.767298393), (-13.886159288, -8.802168614), (-13.911539847, -8.839376887), (-13.9326758, -8.8776864), (-13.949658659, -8.917400732), (-13.960885612, -8.959173898), (-13.968114198, -9.002449596), (-13.969151425, -9.031927247), (-13.969674628, -9.046796522)],
                knots=[0, 0, 0, 0, 1.129580664, 2.226389355, 3.296443603, 4.333934503, 5.352185725, 6.386189251, 7.41493955, 8.447544828, 9.47401038, 10.455044306, 11.4018853, 12.322125673, 13.225630306, 14.132028716, 15.057747923, 16, 16, 16, 16], degree=3))
            add(Edge.make_bspline(
                [(-13.969674628, -9.046796522), (-13.96942526, -9.062303707), (-13.968930669, -9.09306029), (-13.961460572, -9.137952007), (-13.950704952, -9.181246985), (-13.93559834, -9.222539958), (-13.915396116, -9.261806883), (-13.891274294, -9.299429521), (-13.862391756, -9.335144056), (-13.829531642, -9.368758999), (-13.79274489, -9.399085677), (-13.753096834, -9.425804009), (-13.711111133, -9.449360258), (-13.665527406, -9.466326402), (-13.618033802, -9.481855308), (-13.56735795, -9.491276321), (-13.514053346, -9.498208564), (-13.47763421, -9.498735008), (-13.458952473, -9.499005055)],
                knots=[0, 0, 0, 0, 0.973817353, 1.931446211, 2.852767904, 3.776304432, 4.688323523, 5.623710549, 6.581246645, 7.570897993, 8.57436511, 9.572506873, 10.574556662, 11.591826551, 12.624694332, 13.712108235, 14.826391851, 16, 16, 16, 16], degree=3))
            add(Edge.make_bspline(
                [(-13.458952473, -9.499005055), (-13.440068015, -9.498662752), (-13.403268187, -9.497995712), (-13.349474239, -9.492100337), (-13.298594712, -9.482746092), (-13.250690378, -9.469367342), (-13.205580086, -9.452228631), (-13.163868953, -9.430414443), (-13.124604643, -9.405692898), (-13.089048919, -9.37681074), (-13.056583922, -9.345335216), (-13.02861077, -9.310840719), (-13.004825508, -9.274436466), (-12.985640103, -9.235729111), (-12.970159203, -9.194901366), (-12.959540278, -9.151546137), (-12.952950853, -9.106150636), (-12.952351136, -9.075228349), (-12.952046423, -9.059516874)],
                knots=[0, 0, 0, 0, 1.200705402, 2.339794563, 3.437264955, 4.487414319, 5.499029866, 6.500076882, 7.476298407, 8.444948224, 9.407950986, 10.347155707, 11.263432813, 12.167927724, 13.089546445, 14.03463663, 15.00140776, 16, 16, 16, 16], degree=3))
            add(Edge.make_bspline(
                [(-12.952046423, -9.059516874), (-12.952628246, -9.043599995), (-12.953765508, -9.012488012), (-12.959988437, -8.966543851), (-12.971662018, -8.922988069), (-12.986934472, -8.880810497), (-13.007250343, -8.840883929), (-13.032472057, -8.80329263), (-13.061180558, -8.767105421), (-13.094734453, -8.733933223), (-13.131420419, -8.703602043), (-13.170466782, -8.676580291), (-13.211753276, -8.65369536), (-13.255392832, -8.634988065), (-13.301544899, -8.621123427), (-13.349857336, -8.61110201), (-13.40025089, -8.604370418), (-13.434549713, -8.603787874), (-13.451956279, -8.603492235)],
                knots=[0, 0, 0, 0, 1.011708178, 1.977538892, 2.938094892, 3.871441737, 4.823268678, 5.775953079, 6.743660653, 7.753304209, 8.767430709, 9.76505158, 10.765940967, 11.761741361, 12.775867861, 13.822051386, 14.89469657, 16, 16, 16, 16], degree=3))
        make_face(mode=Mode.SUBTRACT)
    extrude(amount=-CUT_EXTRUDE1_DEPTH, mode=Mode.SUBTRACT)


solid = part.part
